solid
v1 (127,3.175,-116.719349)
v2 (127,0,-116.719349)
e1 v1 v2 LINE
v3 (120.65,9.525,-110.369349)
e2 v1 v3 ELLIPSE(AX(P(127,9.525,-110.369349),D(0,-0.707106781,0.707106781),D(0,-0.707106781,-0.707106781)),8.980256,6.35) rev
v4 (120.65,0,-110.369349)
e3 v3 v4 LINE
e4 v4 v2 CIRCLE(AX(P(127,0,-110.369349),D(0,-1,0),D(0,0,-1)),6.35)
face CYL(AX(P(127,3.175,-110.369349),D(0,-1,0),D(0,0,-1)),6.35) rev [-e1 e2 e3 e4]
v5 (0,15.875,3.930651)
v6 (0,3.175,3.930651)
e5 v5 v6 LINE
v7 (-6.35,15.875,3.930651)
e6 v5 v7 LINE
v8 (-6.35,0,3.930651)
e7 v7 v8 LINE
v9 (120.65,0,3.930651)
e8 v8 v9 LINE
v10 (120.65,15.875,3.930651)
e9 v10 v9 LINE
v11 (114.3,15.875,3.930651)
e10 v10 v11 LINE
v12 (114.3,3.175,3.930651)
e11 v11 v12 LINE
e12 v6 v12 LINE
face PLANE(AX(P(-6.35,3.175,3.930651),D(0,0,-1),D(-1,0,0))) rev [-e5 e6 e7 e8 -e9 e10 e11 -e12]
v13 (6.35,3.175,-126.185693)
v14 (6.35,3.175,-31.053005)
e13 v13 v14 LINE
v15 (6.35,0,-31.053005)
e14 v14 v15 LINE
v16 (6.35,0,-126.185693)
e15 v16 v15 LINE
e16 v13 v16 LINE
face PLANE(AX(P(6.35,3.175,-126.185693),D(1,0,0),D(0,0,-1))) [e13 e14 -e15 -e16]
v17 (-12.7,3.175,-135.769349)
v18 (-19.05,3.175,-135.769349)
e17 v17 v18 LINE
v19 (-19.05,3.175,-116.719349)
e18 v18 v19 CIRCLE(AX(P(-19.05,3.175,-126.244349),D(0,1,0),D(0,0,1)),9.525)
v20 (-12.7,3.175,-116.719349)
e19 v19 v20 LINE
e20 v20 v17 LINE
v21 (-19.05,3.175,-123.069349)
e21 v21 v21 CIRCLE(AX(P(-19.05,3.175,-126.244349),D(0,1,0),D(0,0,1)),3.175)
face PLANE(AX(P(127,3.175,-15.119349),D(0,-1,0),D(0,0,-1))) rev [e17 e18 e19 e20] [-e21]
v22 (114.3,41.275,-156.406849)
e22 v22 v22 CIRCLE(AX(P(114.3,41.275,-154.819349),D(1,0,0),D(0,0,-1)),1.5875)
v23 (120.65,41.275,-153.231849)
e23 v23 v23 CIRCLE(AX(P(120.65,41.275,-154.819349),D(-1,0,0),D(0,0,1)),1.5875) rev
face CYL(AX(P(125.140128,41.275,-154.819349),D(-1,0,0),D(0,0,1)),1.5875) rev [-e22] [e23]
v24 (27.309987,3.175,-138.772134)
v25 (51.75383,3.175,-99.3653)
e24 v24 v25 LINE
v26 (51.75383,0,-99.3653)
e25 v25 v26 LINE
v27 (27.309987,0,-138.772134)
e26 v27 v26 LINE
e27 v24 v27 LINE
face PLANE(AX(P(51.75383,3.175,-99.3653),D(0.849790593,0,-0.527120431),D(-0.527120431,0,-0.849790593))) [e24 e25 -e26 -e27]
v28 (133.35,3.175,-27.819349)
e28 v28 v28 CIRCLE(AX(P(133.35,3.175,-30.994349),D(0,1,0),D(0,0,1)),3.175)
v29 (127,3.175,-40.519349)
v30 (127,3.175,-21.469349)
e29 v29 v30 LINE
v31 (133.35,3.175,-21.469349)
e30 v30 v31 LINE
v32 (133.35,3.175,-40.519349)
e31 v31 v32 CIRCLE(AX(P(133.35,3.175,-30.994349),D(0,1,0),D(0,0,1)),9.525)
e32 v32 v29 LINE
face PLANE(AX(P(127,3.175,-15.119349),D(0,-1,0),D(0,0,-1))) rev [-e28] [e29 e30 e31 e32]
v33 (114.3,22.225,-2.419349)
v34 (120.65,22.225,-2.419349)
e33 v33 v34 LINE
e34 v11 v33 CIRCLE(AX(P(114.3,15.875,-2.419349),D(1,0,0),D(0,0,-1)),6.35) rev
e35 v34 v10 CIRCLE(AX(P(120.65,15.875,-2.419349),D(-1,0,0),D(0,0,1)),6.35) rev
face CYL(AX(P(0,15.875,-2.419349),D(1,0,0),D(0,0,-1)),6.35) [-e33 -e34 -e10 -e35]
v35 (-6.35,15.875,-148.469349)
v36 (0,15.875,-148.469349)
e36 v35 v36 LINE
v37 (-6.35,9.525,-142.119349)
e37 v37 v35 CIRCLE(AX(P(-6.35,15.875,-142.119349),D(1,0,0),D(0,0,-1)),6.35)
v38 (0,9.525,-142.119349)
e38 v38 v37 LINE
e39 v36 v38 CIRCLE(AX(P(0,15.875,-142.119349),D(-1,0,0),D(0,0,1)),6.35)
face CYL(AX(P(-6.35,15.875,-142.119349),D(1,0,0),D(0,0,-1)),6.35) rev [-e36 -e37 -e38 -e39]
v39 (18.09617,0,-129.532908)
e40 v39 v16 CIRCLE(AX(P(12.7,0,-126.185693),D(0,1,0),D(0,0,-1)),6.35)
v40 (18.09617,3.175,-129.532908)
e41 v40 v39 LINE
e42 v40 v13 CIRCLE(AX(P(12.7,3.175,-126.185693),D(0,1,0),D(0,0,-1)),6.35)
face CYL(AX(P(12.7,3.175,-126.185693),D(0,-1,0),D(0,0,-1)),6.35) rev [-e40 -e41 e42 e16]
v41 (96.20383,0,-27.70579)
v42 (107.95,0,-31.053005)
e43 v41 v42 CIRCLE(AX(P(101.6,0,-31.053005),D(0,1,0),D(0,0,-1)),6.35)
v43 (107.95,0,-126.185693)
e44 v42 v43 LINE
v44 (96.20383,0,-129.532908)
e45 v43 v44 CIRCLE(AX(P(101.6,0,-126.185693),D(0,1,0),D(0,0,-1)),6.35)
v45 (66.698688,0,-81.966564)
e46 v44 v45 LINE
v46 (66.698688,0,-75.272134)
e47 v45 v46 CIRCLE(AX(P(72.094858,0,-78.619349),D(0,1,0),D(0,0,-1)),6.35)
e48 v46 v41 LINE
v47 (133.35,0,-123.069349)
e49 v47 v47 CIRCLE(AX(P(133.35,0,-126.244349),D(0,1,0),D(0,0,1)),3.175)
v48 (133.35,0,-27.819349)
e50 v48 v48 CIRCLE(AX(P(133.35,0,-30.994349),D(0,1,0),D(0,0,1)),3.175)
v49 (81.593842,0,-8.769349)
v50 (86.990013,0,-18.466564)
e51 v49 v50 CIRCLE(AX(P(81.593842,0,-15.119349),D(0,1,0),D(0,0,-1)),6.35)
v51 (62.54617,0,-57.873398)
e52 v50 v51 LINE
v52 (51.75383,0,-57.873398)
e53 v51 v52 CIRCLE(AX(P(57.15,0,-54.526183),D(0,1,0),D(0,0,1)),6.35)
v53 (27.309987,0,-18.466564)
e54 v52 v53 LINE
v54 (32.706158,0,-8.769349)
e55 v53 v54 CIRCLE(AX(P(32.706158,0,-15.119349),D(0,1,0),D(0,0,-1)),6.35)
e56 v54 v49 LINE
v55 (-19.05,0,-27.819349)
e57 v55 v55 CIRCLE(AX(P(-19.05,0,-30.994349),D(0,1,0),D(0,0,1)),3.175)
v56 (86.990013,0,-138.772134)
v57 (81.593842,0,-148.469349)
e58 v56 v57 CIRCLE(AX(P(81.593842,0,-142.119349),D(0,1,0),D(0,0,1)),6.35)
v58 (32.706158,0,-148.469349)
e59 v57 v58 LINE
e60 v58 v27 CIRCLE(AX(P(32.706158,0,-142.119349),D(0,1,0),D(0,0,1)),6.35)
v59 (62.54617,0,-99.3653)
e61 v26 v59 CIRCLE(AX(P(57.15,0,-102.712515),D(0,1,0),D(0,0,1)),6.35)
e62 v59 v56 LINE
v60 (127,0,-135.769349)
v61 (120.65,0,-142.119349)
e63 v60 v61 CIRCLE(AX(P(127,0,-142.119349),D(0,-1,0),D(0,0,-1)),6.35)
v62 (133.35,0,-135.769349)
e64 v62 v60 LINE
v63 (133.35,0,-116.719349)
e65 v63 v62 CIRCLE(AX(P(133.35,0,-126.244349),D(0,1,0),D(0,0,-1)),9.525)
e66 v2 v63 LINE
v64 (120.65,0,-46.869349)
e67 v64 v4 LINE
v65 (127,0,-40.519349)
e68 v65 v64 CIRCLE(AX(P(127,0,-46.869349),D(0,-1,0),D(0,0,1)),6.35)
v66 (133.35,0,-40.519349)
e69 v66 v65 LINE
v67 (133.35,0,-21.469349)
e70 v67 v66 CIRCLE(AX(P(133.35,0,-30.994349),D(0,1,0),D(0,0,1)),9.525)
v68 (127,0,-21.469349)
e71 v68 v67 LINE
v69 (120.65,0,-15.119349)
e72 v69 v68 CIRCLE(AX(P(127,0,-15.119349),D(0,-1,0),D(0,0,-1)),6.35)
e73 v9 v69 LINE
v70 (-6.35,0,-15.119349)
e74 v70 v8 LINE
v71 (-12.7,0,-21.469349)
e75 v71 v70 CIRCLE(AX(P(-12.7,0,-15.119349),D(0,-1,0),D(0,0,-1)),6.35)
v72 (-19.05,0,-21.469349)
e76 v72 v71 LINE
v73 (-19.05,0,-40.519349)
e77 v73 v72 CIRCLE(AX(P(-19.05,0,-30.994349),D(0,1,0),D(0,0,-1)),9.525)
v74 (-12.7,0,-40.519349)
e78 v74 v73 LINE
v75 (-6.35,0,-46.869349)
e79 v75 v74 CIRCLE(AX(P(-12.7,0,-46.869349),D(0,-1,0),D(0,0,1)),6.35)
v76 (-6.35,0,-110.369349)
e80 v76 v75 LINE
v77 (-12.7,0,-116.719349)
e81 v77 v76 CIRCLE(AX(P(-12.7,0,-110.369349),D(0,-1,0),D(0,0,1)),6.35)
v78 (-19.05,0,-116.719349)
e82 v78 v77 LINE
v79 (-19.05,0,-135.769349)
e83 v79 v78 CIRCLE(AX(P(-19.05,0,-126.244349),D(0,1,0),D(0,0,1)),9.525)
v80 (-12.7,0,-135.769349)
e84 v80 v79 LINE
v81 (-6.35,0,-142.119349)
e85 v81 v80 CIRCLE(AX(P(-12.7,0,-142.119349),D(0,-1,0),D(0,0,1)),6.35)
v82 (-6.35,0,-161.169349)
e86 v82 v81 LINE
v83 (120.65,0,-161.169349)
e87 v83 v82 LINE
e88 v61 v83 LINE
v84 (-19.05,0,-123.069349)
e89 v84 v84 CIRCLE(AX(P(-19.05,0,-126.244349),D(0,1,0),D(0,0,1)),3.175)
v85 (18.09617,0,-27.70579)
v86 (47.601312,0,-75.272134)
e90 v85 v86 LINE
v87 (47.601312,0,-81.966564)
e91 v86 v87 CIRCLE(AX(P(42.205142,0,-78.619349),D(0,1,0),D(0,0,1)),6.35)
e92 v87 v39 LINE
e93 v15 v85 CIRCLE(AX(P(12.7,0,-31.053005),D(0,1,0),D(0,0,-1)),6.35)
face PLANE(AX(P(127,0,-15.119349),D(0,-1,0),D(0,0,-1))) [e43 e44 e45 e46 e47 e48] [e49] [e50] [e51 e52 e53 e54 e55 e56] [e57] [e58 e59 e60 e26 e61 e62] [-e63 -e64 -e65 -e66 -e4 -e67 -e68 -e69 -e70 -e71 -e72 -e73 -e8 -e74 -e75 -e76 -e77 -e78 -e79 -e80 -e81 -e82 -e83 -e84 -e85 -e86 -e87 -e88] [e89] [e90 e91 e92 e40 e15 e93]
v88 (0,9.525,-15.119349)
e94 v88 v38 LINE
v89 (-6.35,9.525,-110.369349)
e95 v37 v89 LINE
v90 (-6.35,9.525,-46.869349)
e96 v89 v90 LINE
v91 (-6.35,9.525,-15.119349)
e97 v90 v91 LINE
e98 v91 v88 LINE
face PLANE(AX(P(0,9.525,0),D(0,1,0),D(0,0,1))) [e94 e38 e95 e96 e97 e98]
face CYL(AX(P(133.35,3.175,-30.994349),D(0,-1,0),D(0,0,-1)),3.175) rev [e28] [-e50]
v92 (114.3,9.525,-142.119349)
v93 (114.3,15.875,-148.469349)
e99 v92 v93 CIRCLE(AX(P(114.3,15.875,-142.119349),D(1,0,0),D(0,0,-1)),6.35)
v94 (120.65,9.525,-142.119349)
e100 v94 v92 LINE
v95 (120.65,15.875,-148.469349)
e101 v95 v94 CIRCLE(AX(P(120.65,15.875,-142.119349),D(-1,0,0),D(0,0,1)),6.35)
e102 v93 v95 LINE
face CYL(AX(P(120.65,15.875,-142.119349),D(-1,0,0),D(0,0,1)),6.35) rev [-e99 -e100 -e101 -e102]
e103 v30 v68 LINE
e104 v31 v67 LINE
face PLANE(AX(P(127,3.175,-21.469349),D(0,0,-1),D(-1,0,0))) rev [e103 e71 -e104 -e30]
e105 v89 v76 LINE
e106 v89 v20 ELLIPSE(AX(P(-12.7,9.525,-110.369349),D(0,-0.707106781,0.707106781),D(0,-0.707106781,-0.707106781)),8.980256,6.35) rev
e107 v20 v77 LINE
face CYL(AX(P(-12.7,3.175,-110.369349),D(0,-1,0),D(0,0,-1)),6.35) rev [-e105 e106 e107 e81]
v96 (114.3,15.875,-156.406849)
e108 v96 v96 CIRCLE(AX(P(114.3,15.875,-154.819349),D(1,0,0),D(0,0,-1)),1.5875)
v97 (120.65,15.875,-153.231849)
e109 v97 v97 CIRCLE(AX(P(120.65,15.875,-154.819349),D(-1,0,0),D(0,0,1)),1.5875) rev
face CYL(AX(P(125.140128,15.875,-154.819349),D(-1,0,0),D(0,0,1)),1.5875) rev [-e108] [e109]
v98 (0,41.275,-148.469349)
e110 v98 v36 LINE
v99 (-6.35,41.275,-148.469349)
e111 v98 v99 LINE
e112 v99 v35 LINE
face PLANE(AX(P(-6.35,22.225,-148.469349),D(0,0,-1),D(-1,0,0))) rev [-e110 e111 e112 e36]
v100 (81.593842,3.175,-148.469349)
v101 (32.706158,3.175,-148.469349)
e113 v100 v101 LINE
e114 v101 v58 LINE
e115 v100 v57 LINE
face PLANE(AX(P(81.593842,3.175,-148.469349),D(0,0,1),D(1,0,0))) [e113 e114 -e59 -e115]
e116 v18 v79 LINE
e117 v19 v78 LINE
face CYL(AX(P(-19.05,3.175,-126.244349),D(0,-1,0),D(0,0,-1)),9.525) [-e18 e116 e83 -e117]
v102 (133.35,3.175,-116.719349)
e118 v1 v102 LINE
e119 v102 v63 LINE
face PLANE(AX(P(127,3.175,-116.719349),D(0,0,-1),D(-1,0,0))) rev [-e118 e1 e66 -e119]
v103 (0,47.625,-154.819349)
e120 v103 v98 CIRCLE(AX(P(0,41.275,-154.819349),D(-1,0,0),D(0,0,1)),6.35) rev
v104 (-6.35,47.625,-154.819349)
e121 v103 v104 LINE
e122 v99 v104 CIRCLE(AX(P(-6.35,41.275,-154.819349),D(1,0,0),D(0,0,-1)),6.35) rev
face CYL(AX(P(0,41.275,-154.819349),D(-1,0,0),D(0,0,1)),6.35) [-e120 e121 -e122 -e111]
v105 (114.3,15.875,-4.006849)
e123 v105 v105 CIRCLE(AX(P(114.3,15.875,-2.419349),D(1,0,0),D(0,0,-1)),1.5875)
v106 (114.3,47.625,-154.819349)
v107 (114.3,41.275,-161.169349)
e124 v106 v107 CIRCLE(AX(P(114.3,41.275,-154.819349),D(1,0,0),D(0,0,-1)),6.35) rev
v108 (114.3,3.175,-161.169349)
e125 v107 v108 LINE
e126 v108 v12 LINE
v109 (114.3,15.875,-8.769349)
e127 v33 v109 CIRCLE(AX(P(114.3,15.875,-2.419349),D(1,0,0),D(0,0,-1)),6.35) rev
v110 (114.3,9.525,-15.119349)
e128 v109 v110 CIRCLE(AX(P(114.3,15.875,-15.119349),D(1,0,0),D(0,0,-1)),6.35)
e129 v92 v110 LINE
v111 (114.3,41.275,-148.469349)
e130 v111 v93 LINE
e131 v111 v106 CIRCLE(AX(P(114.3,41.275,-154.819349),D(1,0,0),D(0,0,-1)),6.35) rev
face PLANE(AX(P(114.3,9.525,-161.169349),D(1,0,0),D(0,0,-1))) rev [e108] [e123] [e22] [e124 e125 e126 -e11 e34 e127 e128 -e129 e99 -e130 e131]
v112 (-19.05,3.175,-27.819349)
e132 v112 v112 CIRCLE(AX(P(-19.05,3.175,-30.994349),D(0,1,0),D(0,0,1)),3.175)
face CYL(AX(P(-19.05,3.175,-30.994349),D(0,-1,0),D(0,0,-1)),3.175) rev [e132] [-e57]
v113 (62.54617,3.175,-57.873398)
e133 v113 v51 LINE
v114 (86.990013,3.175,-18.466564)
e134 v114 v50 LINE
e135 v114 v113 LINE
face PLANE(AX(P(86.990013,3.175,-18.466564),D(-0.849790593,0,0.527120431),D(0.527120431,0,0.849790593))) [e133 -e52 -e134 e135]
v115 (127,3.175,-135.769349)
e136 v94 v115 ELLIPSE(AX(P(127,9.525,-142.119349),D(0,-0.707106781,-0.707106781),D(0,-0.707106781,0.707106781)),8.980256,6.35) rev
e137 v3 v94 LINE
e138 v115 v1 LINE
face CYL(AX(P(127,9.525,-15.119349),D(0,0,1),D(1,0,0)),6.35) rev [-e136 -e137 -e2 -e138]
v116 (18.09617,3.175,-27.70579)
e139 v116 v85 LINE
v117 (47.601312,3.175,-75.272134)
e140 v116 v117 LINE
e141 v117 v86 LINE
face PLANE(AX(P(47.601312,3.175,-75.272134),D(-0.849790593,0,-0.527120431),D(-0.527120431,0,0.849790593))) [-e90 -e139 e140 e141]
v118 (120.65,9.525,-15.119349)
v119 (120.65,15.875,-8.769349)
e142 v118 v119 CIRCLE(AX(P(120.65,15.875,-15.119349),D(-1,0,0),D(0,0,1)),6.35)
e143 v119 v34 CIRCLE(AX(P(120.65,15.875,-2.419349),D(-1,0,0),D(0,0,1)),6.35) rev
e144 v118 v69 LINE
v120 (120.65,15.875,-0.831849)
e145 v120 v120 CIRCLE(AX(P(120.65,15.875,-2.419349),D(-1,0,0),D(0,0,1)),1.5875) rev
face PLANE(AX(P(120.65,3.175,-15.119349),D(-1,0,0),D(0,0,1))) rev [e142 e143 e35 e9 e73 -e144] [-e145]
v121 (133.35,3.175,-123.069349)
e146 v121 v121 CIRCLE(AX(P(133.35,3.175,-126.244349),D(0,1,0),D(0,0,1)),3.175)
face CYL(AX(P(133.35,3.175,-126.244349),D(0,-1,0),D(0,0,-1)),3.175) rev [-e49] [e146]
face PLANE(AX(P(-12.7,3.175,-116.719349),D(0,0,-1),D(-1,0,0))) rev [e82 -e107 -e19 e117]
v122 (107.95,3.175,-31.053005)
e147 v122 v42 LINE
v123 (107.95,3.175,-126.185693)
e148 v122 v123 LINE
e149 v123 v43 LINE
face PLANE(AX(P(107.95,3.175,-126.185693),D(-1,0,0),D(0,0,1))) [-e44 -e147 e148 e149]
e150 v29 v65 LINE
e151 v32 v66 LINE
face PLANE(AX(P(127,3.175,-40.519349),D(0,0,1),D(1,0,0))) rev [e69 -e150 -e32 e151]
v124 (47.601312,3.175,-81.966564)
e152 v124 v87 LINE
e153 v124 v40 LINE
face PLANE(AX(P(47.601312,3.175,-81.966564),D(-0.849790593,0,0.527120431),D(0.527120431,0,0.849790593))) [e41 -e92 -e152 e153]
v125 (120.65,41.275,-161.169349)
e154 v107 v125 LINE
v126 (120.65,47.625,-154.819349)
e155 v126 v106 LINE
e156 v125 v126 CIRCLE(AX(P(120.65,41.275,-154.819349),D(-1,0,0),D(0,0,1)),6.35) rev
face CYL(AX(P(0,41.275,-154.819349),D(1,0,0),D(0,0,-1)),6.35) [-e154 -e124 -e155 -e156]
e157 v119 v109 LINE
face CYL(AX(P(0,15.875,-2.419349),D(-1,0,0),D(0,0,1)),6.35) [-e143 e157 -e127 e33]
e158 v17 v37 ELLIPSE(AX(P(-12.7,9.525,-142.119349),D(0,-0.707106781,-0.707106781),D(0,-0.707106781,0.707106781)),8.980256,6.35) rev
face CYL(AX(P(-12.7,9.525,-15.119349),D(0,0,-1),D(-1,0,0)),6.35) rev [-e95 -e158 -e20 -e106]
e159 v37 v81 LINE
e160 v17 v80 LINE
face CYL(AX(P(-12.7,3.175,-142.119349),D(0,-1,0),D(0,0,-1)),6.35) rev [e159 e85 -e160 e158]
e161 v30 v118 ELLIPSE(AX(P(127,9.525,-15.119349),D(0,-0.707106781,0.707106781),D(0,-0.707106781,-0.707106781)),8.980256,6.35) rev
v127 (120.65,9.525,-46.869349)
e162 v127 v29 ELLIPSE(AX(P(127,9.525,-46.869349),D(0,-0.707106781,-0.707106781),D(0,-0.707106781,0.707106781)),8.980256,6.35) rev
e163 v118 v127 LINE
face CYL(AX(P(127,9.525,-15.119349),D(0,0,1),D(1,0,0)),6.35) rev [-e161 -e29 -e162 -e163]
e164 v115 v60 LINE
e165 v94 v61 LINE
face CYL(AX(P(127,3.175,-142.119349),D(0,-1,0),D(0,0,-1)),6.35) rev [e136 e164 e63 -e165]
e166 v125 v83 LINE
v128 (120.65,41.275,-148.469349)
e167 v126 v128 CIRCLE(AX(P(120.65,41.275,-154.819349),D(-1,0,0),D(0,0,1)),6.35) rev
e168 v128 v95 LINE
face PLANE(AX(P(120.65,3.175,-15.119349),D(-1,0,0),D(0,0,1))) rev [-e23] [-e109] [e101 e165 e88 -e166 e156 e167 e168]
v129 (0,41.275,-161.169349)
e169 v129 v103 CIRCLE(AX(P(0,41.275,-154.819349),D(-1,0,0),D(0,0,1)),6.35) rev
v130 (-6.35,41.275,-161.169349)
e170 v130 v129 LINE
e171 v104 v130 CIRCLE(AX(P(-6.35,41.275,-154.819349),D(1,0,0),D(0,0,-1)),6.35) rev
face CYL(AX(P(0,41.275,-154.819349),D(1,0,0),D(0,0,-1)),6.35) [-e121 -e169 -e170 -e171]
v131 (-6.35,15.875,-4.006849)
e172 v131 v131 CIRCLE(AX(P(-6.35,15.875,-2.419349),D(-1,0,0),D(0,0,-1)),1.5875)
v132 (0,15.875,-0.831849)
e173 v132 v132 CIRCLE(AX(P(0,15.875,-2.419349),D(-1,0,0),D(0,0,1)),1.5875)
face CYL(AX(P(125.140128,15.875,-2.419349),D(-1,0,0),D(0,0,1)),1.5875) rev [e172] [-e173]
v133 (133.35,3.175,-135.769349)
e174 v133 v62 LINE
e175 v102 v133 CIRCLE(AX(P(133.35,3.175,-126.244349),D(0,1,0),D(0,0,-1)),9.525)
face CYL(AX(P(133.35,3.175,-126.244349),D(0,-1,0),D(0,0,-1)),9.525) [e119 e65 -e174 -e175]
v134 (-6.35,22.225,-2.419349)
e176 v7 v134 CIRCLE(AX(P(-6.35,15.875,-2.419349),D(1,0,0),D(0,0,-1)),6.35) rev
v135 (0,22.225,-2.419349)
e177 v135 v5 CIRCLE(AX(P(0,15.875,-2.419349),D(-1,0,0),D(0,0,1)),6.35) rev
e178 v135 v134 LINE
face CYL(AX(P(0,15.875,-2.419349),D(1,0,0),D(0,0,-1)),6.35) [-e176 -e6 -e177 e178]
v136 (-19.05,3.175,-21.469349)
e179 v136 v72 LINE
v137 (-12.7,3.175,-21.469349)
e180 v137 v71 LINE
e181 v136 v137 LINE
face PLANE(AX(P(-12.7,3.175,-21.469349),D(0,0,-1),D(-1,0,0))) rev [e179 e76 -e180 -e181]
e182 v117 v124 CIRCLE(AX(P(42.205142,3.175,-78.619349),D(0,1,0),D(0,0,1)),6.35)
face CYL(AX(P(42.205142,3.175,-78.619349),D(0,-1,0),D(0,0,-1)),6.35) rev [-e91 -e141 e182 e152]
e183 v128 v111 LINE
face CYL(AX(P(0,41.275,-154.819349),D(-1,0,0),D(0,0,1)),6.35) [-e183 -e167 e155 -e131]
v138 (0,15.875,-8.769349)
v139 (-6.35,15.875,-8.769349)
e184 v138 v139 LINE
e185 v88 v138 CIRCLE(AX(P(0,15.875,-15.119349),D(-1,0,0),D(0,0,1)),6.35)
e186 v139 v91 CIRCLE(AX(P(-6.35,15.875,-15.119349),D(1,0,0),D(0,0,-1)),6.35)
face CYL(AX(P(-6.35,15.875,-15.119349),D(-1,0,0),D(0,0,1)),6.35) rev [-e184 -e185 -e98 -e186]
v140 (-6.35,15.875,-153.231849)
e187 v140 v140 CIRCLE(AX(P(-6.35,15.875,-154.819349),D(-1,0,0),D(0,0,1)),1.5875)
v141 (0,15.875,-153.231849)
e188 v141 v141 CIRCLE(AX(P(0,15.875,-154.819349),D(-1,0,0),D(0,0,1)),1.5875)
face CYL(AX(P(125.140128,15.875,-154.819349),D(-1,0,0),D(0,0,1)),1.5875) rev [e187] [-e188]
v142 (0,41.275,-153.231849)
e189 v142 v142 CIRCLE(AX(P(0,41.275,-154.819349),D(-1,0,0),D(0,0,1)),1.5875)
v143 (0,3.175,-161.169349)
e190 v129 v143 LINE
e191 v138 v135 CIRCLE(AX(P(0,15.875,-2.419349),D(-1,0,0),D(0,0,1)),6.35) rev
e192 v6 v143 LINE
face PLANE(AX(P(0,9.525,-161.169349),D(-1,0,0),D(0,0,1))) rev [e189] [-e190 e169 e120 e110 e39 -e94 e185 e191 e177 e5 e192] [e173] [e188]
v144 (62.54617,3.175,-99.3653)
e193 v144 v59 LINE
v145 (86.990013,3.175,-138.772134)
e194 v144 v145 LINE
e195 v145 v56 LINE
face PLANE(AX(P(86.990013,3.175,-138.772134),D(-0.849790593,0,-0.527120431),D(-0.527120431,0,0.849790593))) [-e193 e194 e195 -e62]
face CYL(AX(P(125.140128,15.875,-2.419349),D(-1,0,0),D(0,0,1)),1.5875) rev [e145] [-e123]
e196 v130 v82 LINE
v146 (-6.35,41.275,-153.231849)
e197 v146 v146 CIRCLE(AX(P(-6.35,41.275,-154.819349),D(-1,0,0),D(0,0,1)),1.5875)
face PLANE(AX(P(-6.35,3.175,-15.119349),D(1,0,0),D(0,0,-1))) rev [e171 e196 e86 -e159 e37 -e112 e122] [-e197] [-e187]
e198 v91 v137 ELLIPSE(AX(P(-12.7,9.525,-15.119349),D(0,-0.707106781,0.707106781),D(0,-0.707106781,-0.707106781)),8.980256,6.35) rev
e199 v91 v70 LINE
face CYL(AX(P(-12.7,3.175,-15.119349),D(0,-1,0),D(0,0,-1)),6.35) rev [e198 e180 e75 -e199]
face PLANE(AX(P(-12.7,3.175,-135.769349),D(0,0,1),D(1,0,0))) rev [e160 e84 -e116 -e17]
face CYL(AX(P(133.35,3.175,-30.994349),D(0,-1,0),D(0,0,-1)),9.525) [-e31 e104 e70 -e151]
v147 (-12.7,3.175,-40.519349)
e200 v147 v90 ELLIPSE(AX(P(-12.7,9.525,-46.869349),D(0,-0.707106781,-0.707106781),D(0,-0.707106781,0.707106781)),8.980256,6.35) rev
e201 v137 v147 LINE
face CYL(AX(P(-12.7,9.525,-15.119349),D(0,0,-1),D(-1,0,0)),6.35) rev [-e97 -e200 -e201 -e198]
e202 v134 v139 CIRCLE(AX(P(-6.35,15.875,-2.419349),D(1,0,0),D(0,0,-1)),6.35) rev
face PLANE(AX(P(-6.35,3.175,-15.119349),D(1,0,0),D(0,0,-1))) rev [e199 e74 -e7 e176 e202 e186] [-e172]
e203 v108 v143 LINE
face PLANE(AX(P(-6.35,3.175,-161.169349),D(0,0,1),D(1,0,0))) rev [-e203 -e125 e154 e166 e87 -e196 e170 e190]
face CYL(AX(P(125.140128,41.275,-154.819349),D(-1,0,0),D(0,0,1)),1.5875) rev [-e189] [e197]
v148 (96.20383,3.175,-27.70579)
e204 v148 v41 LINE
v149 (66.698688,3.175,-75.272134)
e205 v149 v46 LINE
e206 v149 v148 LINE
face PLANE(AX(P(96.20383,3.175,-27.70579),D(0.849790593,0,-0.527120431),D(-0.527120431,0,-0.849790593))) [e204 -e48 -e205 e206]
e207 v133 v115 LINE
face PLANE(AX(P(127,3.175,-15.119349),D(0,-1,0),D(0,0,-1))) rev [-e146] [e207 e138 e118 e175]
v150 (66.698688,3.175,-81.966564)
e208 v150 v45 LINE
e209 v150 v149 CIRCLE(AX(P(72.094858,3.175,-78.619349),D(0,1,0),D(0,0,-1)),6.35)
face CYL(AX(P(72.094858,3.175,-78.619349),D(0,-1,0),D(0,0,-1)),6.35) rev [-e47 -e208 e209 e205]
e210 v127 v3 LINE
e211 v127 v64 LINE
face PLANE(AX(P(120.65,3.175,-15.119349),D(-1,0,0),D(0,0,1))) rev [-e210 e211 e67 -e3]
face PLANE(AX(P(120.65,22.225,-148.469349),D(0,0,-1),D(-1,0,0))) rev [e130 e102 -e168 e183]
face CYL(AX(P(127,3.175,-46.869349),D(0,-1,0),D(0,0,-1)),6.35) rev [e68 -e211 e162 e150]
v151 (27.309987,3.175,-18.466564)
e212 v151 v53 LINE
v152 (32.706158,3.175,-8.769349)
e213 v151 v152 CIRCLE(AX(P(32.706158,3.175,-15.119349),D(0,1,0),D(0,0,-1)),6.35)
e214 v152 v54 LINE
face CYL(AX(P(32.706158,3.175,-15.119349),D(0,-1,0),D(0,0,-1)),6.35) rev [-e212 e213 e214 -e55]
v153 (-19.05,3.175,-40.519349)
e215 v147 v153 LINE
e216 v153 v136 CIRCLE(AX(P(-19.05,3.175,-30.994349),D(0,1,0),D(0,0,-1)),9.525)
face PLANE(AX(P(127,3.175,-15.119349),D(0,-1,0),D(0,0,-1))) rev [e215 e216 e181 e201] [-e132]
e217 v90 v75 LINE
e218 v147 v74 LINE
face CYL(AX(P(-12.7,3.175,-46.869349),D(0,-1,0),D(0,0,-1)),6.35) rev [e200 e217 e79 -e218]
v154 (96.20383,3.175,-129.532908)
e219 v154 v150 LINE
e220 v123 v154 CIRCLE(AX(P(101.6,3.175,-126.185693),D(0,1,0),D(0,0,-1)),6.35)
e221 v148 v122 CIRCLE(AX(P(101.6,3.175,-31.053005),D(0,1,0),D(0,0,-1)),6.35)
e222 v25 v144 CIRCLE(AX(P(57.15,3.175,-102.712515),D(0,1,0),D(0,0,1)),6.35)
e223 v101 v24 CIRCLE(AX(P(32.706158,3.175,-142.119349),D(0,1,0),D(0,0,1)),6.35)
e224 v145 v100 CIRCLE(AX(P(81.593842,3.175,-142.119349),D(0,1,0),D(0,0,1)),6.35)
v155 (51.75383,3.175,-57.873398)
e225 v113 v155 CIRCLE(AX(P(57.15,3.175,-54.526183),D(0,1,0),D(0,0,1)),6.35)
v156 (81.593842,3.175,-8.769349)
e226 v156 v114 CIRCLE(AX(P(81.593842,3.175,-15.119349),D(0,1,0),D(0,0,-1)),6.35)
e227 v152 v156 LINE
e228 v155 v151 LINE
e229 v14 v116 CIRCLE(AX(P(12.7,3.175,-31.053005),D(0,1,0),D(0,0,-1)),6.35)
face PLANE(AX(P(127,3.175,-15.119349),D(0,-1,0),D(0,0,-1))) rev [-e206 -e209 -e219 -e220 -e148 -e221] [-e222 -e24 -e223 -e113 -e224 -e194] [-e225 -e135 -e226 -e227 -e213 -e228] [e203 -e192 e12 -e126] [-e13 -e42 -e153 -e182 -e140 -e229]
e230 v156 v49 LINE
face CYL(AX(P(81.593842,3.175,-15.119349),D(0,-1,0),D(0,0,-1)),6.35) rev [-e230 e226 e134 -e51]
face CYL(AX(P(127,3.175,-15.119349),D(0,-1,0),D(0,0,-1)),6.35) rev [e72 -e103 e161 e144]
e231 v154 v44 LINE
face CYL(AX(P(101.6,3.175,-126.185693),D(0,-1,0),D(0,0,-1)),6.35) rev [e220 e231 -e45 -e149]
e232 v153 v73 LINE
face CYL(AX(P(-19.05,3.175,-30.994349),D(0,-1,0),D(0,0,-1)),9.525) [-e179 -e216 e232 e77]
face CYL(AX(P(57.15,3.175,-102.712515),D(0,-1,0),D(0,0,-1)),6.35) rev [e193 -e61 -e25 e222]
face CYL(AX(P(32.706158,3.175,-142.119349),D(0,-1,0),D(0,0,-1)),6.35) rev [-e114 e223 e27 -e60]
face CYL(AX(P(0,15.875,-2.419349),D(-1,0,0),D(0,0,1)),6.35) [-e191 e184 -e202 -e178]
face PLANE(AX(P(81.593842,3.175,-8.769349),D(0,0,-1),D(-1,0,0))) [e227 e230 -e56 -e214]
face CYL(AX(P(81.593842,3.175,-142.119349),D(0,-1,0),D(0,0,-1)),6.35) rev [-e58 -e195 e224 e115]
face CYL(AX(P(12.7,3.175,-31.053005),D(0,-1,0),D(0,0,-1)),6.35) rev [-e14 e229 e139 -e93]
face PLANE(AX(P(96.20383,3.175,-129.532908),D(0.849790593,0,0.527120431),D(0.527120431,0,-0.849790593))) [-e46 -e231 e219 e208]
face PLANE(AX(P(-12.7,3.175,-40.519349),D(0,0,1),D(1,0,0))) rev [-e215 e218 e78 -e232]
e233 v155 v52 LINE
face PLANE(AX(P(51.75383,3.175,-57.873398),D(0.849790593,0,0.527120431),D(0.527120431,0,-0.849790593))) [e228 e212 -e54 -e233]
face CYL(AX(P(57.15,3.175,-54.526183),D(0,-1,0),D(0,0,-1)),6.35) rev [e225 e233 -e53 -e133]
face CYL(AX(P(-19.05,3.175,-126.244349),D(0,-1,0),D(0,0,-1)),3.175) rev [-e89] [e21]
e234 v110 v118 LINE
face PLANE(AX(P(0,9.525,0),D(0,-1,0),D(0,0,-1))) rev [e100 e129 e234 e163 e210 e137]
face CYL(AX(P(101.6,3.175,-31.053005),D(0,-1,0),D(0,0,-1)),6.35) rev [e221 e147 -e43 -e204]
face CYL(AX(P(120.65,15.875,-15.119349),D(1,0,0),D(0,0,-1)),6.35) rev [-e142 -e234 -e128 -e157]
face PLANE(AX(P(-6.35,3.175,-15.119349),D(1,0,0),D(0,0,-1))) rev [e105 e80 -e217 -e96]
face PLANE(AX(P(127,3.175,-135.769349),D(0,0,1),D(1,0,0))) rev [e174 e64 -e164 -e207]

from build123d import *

# Parameters (mm, degrees)
SKETCH1_R           = 3.175
BOSS_EXTRUDE1_DEPTH = 3.175
SKETCH2_W           = 6.35
SKETCH2_H           = 165.1
BOSS_EXTRUDE3_DEPTH = 6.35
SKETCH3_W           = 6.35
SKETCH3_H           = 12.7
BOSS_EXTRUDE4_DEPTH = 12.7
SKETCH4_W           = 6.35
SKETCH4_H           = 12.7
BOSS_EXTRUDE5_DEPTH = 25.4
FILLET1_R           = 6.35
FILLET3_R           = 6.35
CUT_EXTRUDE1_REACH  = 226.748
SKETCH6_R           = 1.5875


with BuildPart() as part:
    # Sketch1 → Boss-Extrude1 (new body)
    with BuildSketch(Plane(origin=(0, 0, 0), x_dir=(1, 0, 0), z_dir=(0, 1, 0))):
        with BuildLine():
            Line((-6.35, 161.169349013), (120.65, 161.169349013))
            Line((120.65, 161.169349013), (120.65, 142.119349013))
            ThreePointArc((120.65, 142.119349013), (122.509871939, 137.629220953), (127, 135.769349013))
            Line((127, 135.769349013), (133.35, 135.769349013))
            ThreePointArc((133.35, 135.769349013), (142.875, 126.244349013), (133.35, 116.719349013))
            Line((133.35, 116.719349013), (127, 116.719349013))
            ThreePointArc((127, 116.719349013), (122.509871939, 114.859477074), (120.65, 110.369349013))
            Line((120.65, 110.369349013), (120.65, 46.869349013))
            ThreePointArc((120.65, 46.869349013), (122.509871939, 42.379220953), (127, 40.519349013))
            Line((127, 40.519349013), (133.35, 40.519349013))
            ThreePointArc((133.35, 40.519349013), (142.875, 30.994349013), (133.35, 21.469349013))
            Line((133.35, 21.469349013), (127, 21.469349013))
            ThreePointArc((127, 21.469349013), (122.509871939, 19.609477074), (120.65, 15.119349013))
            Line((120.65, 15.119349013), (120.65, -3.930650987))
            Line((120.65, -3.930650987), (-6.35, -3.930650987))
            Line((-6.35, -3.930650987), (-6.35, 15.119349013))
            ThreePointArc((-6.35, 15.119349013), (-8.209871939, 19.609477074), (-12.7, 21.469349013))
            Line((-12.7, 21.469349013), (-19.05, 21.469349013))
            ThreePointArc((-19.05, 21.469349013), (-28.575, 30.994349013), (-19.05, 40.519349013))
            Line((-19.05, 40.519349013), (-12.7, 40.519349013))
            ThreePointArc((-12.7, 40.519349013), (-8.209871939, 42.379220953), (-6.35, 46.869349013))
            Line((-6.35, 46.869349013), (-6.35, 110.369349013))
            ThreePointArc((-6.35, 110.369349013), (-8.209871939, 114.859477074), (-12.7, 116.719349013))
            Line((-12.7, 116.719349013), (-19.05, 116.719349013))
            ThreePointArc((-19.05, 116.719349013), (-28.575, 126.244349013), (-19.05, 135.769349013))
            Line((-19.05, 135.769349013), (-12.7, 135.769349013))
            ThreePointArc((-12.7, 135.769349013), (-8.209871939, 137.629220953), (-6.35, 142.119349013))
            Line((-6.35, 142.119349013), (-6.35, 161.169349013))
        make_face()
        with Locations(Location((-19.05, 126.244349013, 0), (0, 0, 270))):
            Circle(SKETCH1_R, mode=Mode.SUBTRACT)
        with Locations(Location((-19.05, 30.994349013, 0), (0, 0, 270))):
            Circle(SKETCH1_R, mode=Mode.SUBTRACT)
        with Locations(Location((133.35, 30.994349013, 0), (0, 0, 270))):
            Circle(SKETCH1_R, mode=Mode.SUBTRACT)
        with Locations(Location((133.35, 126.244349013, 0), (0, 0, 270))):
            Circle(SKETCH1_R, mode=Mode.SUBTRACT)
        with BuildLine():
            Line((81.593842457, 148.469349013), (32.706157543, 148.469349013))
            ThreePointArc((32.706157543, 148.469349013), (27.157404819, 145.207041228), (27.30998728, 138.772134277))
            Line((27.30998728, 138.772134277), (51.753829737, 99.36530019))
            ThreePointArc((51.753829737, 99.36530019), (57.15, 96.362514927), (62.546170263, 99.36530019))
            Line((62.546170263, 99.36530019), (86.99001272, 138.772134277))
            ThreePointArc((86.99001272, 138.772134277), (87.142595181, 145.207041228), (81.593842457, 148.469349013))
        make_face(mode=Mode.SUBTRACT)
        with BuildLine():
            Line((107.95, 126.185693187), (107.95, 31.05300484))
            ThreePointArc((107.95, 31.05300484), (103.340232575, 24.946116059), (96.203829737, 27.705790103))
            Line((96.203829737, 27.705790103), (66.698688048, 75.272134277))
            ThreePointArc((66.698688048, 75.272134277), (65.744858311, 78.619349013), (66.698688048, 81.96656375))
            Line((66.698688048, 81.96656375), (96.203829737, 129.532907923))
            ThreePointArc((96.203829737, 129.532907923), (103.340232575, 132.292581968), (107.95, 126.185693187))
        make_face(mode=Mode.SUBTRACT)
        with BuildLine():
            Line((81.593842457, 8.769349013), (32.706157543, 8.769349013))
            ThreePointArc((32.706157543, 8.769349013), (27.157404819, 12.031656799), (27.30998728, 18.46656375))
            Line((27.30998728, 18.46656375), (51.753829737, 57.873397836))
            ThreePointArc((51.753829737, 57.873397836), (57.15, 60.876183099), (62.546170263, 57.873397836))
            Line((62.546170263, 57.873397836), (86.99001272, 18.46656375))
            ThreePointArc((86.99001272, 18.46656375), (87.142595181, 12.031656799), (81.593842457, 8.769349013))
        make_face(mode=Mode.SUBTRACT)
        with BuildLine():
            Line((6.35, 126.185693187), (6.35, 31.05300484))
            ThreePointArc((6.35, 31.05300484), (10.959767425, 24.946116059), (18.096170263, 27.705790103))
            Line((18.096170263, 27.705790103), (47.601311952, 75.272134277))
            ThreePointArc((47.601311952, 75.272134277), (48.555141689, 78.619349013), (47.601311952, 81.96656375))
            Line((47.601311952, 81.96656375), (18.096170263, 129.532907923))
            ThreePointArc((18.096170263, 129.532907923), (10.959767425, 132.292581968), (6.35, 126.185693187))
        make_face(mode=Mode.SUBTRACT)
    extrude(amount=BOSS_EXTRUDE1_DEPTH)

    # Sketch2 → Boss-Extrude3 (add)
    with BuildSketch(Plane(origin=(0, 3.175, 0), x_dir=(1, 0, 0), z_dir=(0, 1, 0))):
        with Locations((-3.175, 78.619349013)):
            Rectangle(SKETCH2_W, SKETCH2_H)
        with Locations((117.475, 78.619349013)):
            Rectangle(SKETCH2_W, SKETCH2_H)
    extrude(amount=BOSS_EXTRUDE3_DEPTH)

    # Sketch3 → Boss-Extrude4 (add)
    with BuildSketch(Plane(origin=(0, 9.525, 0), x_dir=(1, 0, 0), z_dir=(0, 1, 0))):
        with Locations((-3.175, 154.819349013)):
            Rectangle(SKETCH3_W, SKETCH3_H)
        with Locations((117.475, 154.819349013)):
            Rectangle(SKETCH3_W, SKETCH3_H)
        with Locations((117.475, 2.419349013)):
            Rectangle(SKETCH3_W, SKETCH3_H)
        with Locations((-3.175, 2.419349013)):
            Rectangle(SKETCH3_W, SKETCH3_H)
    extrude(amount=BOSS_EXTRUDE4_DEPTH)

    # Sketch4 → Boss-Extrude5 (add)
    with BuildSketch(Plane(origin=(0, 22.225, 0), x_dir=(1, 0, 0), z_dir=(0, 1, 0))):
        with Locations((-3.175, 154.819349013)):
            Rectangle(SKETCH4_W, SKETCH4_H)
        with Locations((117.475, 154.819349013)):
            Rectangle(SKETCH4_W, SKETCH4_H)
    extrude(amount=BOSS_EXTRUDE5_DEPTH)

    # Fillet1
    fillet1_edges = [part.edges().sort_by_distance(p)[0] for p in [
        (117.475, 22.225, -8.769349013),
        (117.475, 22.225, 3.930650987),
        (-3.175, 22.225, 3.930650987),
        (-3.175, 22.225, -8.769349013),
        (117.475, 47.625, -148.469349013),
        (117.475, 47.625, -161.169349013),
        (-3.175, 47.625, -148.469349013),
        (-3.175, 47.625, -161.169349013),
        (117.475, 9.525, -148.469349013),
        (117.475, 9.525, -8.769349013),
        (-3.175, 9.525, -8.769349013),
        (-3.175, 9.525, -148.469349013),
    ]]
    fillet(fillet1_edges, radius=FILLET1_R - 0.0001)  # a hair under: the kernel refuses the full size

    # Fillet3
    fillet3_edges = [part.edges().sort_by_distance(p)[0] for p in [
        (120.65, 3.175, -30.994349013),
        (120.65, 3.175, -126.244349013),
        (-6.35, 3.175, -30.994349013),
        (-6.35, 3.175, -126.244349013),
    ]]
    fillet(fillet3_edges, radius=FILLET3_R - 0.0001)  # a hair under: the kernel refuses the full size

    # Cut-Extrude1: up to this face of the body (flat: up to its plane)
    cut_extrude1_end = Plane(part.part.faces().sort_by_distance((120.65, 4.76245, -13.401031504))[0])
    # Sketch6 → Cut-Extrude1 (cut, up to the picked face)
    with BuildSketch(Plane.ZY.offset(6.35), mode=Mode.PRIVATE) as cut_extrude1_sk1:
        with Locations((-154.819349013, 41.275)):
            Circle(SKETCH6_R)
    cut_extrude1_tool1 = split(extrude(cut_extrude1_sk1.sketch, amount=-CUT_EXTRUDE1_REACH, mode=Mode.PRIVATE), bisect_by=cut_extrude1_end, keep=Keep.BOTH, mode=Mode.PRIVATE)
    # Sketch6 → Cut-Extrude1 (cut, up to the picked face)
    with BuildSketch(Plane.ZY.offset(6.35), mode=Mode.PRIVATE) as cut_extrude1_sk2:
        with Locations((-154.819349013, 15.875)):
            Circle(SKETCH6_R)
    cut_extrude1_tool2 = split(extrude(cut_extrude1_sk2.sketch, amount=-CUT_EXTRUDE1_REACH, mode=Mode.PRIVATE), bisect_by=cut_extrude1_end, keep=Keep.BOTH, mode=Mode.PRIVATE)
    # Sketch6 → Cut-Extrude1 (cut, up to the picked face)
    with BuildSketch(Plane.ZY.offset(6.35), mode=Mode.PRIVATE) as cut_extrude1_sk3:
        with Locations((-2.419349013, 15.875)):
            Circle(SKETCH6_R)
    cut_extrude1_tool3 = split(extrude(cut_extrude1_sk3.sketch, amount=-CUT_EXTRUDE1_REACH, mode=Mode.PRIVATE), bisect_by=cut_extrude1_end, keep=Keep.BOTH, mode=Mode.PRIVATE)
    add(cut_extrude1_tool1.solids().sort_by(Axis((-6.35, 41.275, -154.819349), (1, 0, 0)))[0], mode=Mode.SUBTRACT)
    add(cut_extrude1_tool2.solids().sort_by(Axis((-6.35, 15.875, -154.819349), (1, 0, 0)))[0], mode=Mode.SUBTRACT)
    add(cut_extrude1_tool3.solids().sort_by(Axis((-6.35, 15.875, -2.419349), (1, 0, 0)))[0], mode=Mode.SUBTRACT)


solid = part.part
